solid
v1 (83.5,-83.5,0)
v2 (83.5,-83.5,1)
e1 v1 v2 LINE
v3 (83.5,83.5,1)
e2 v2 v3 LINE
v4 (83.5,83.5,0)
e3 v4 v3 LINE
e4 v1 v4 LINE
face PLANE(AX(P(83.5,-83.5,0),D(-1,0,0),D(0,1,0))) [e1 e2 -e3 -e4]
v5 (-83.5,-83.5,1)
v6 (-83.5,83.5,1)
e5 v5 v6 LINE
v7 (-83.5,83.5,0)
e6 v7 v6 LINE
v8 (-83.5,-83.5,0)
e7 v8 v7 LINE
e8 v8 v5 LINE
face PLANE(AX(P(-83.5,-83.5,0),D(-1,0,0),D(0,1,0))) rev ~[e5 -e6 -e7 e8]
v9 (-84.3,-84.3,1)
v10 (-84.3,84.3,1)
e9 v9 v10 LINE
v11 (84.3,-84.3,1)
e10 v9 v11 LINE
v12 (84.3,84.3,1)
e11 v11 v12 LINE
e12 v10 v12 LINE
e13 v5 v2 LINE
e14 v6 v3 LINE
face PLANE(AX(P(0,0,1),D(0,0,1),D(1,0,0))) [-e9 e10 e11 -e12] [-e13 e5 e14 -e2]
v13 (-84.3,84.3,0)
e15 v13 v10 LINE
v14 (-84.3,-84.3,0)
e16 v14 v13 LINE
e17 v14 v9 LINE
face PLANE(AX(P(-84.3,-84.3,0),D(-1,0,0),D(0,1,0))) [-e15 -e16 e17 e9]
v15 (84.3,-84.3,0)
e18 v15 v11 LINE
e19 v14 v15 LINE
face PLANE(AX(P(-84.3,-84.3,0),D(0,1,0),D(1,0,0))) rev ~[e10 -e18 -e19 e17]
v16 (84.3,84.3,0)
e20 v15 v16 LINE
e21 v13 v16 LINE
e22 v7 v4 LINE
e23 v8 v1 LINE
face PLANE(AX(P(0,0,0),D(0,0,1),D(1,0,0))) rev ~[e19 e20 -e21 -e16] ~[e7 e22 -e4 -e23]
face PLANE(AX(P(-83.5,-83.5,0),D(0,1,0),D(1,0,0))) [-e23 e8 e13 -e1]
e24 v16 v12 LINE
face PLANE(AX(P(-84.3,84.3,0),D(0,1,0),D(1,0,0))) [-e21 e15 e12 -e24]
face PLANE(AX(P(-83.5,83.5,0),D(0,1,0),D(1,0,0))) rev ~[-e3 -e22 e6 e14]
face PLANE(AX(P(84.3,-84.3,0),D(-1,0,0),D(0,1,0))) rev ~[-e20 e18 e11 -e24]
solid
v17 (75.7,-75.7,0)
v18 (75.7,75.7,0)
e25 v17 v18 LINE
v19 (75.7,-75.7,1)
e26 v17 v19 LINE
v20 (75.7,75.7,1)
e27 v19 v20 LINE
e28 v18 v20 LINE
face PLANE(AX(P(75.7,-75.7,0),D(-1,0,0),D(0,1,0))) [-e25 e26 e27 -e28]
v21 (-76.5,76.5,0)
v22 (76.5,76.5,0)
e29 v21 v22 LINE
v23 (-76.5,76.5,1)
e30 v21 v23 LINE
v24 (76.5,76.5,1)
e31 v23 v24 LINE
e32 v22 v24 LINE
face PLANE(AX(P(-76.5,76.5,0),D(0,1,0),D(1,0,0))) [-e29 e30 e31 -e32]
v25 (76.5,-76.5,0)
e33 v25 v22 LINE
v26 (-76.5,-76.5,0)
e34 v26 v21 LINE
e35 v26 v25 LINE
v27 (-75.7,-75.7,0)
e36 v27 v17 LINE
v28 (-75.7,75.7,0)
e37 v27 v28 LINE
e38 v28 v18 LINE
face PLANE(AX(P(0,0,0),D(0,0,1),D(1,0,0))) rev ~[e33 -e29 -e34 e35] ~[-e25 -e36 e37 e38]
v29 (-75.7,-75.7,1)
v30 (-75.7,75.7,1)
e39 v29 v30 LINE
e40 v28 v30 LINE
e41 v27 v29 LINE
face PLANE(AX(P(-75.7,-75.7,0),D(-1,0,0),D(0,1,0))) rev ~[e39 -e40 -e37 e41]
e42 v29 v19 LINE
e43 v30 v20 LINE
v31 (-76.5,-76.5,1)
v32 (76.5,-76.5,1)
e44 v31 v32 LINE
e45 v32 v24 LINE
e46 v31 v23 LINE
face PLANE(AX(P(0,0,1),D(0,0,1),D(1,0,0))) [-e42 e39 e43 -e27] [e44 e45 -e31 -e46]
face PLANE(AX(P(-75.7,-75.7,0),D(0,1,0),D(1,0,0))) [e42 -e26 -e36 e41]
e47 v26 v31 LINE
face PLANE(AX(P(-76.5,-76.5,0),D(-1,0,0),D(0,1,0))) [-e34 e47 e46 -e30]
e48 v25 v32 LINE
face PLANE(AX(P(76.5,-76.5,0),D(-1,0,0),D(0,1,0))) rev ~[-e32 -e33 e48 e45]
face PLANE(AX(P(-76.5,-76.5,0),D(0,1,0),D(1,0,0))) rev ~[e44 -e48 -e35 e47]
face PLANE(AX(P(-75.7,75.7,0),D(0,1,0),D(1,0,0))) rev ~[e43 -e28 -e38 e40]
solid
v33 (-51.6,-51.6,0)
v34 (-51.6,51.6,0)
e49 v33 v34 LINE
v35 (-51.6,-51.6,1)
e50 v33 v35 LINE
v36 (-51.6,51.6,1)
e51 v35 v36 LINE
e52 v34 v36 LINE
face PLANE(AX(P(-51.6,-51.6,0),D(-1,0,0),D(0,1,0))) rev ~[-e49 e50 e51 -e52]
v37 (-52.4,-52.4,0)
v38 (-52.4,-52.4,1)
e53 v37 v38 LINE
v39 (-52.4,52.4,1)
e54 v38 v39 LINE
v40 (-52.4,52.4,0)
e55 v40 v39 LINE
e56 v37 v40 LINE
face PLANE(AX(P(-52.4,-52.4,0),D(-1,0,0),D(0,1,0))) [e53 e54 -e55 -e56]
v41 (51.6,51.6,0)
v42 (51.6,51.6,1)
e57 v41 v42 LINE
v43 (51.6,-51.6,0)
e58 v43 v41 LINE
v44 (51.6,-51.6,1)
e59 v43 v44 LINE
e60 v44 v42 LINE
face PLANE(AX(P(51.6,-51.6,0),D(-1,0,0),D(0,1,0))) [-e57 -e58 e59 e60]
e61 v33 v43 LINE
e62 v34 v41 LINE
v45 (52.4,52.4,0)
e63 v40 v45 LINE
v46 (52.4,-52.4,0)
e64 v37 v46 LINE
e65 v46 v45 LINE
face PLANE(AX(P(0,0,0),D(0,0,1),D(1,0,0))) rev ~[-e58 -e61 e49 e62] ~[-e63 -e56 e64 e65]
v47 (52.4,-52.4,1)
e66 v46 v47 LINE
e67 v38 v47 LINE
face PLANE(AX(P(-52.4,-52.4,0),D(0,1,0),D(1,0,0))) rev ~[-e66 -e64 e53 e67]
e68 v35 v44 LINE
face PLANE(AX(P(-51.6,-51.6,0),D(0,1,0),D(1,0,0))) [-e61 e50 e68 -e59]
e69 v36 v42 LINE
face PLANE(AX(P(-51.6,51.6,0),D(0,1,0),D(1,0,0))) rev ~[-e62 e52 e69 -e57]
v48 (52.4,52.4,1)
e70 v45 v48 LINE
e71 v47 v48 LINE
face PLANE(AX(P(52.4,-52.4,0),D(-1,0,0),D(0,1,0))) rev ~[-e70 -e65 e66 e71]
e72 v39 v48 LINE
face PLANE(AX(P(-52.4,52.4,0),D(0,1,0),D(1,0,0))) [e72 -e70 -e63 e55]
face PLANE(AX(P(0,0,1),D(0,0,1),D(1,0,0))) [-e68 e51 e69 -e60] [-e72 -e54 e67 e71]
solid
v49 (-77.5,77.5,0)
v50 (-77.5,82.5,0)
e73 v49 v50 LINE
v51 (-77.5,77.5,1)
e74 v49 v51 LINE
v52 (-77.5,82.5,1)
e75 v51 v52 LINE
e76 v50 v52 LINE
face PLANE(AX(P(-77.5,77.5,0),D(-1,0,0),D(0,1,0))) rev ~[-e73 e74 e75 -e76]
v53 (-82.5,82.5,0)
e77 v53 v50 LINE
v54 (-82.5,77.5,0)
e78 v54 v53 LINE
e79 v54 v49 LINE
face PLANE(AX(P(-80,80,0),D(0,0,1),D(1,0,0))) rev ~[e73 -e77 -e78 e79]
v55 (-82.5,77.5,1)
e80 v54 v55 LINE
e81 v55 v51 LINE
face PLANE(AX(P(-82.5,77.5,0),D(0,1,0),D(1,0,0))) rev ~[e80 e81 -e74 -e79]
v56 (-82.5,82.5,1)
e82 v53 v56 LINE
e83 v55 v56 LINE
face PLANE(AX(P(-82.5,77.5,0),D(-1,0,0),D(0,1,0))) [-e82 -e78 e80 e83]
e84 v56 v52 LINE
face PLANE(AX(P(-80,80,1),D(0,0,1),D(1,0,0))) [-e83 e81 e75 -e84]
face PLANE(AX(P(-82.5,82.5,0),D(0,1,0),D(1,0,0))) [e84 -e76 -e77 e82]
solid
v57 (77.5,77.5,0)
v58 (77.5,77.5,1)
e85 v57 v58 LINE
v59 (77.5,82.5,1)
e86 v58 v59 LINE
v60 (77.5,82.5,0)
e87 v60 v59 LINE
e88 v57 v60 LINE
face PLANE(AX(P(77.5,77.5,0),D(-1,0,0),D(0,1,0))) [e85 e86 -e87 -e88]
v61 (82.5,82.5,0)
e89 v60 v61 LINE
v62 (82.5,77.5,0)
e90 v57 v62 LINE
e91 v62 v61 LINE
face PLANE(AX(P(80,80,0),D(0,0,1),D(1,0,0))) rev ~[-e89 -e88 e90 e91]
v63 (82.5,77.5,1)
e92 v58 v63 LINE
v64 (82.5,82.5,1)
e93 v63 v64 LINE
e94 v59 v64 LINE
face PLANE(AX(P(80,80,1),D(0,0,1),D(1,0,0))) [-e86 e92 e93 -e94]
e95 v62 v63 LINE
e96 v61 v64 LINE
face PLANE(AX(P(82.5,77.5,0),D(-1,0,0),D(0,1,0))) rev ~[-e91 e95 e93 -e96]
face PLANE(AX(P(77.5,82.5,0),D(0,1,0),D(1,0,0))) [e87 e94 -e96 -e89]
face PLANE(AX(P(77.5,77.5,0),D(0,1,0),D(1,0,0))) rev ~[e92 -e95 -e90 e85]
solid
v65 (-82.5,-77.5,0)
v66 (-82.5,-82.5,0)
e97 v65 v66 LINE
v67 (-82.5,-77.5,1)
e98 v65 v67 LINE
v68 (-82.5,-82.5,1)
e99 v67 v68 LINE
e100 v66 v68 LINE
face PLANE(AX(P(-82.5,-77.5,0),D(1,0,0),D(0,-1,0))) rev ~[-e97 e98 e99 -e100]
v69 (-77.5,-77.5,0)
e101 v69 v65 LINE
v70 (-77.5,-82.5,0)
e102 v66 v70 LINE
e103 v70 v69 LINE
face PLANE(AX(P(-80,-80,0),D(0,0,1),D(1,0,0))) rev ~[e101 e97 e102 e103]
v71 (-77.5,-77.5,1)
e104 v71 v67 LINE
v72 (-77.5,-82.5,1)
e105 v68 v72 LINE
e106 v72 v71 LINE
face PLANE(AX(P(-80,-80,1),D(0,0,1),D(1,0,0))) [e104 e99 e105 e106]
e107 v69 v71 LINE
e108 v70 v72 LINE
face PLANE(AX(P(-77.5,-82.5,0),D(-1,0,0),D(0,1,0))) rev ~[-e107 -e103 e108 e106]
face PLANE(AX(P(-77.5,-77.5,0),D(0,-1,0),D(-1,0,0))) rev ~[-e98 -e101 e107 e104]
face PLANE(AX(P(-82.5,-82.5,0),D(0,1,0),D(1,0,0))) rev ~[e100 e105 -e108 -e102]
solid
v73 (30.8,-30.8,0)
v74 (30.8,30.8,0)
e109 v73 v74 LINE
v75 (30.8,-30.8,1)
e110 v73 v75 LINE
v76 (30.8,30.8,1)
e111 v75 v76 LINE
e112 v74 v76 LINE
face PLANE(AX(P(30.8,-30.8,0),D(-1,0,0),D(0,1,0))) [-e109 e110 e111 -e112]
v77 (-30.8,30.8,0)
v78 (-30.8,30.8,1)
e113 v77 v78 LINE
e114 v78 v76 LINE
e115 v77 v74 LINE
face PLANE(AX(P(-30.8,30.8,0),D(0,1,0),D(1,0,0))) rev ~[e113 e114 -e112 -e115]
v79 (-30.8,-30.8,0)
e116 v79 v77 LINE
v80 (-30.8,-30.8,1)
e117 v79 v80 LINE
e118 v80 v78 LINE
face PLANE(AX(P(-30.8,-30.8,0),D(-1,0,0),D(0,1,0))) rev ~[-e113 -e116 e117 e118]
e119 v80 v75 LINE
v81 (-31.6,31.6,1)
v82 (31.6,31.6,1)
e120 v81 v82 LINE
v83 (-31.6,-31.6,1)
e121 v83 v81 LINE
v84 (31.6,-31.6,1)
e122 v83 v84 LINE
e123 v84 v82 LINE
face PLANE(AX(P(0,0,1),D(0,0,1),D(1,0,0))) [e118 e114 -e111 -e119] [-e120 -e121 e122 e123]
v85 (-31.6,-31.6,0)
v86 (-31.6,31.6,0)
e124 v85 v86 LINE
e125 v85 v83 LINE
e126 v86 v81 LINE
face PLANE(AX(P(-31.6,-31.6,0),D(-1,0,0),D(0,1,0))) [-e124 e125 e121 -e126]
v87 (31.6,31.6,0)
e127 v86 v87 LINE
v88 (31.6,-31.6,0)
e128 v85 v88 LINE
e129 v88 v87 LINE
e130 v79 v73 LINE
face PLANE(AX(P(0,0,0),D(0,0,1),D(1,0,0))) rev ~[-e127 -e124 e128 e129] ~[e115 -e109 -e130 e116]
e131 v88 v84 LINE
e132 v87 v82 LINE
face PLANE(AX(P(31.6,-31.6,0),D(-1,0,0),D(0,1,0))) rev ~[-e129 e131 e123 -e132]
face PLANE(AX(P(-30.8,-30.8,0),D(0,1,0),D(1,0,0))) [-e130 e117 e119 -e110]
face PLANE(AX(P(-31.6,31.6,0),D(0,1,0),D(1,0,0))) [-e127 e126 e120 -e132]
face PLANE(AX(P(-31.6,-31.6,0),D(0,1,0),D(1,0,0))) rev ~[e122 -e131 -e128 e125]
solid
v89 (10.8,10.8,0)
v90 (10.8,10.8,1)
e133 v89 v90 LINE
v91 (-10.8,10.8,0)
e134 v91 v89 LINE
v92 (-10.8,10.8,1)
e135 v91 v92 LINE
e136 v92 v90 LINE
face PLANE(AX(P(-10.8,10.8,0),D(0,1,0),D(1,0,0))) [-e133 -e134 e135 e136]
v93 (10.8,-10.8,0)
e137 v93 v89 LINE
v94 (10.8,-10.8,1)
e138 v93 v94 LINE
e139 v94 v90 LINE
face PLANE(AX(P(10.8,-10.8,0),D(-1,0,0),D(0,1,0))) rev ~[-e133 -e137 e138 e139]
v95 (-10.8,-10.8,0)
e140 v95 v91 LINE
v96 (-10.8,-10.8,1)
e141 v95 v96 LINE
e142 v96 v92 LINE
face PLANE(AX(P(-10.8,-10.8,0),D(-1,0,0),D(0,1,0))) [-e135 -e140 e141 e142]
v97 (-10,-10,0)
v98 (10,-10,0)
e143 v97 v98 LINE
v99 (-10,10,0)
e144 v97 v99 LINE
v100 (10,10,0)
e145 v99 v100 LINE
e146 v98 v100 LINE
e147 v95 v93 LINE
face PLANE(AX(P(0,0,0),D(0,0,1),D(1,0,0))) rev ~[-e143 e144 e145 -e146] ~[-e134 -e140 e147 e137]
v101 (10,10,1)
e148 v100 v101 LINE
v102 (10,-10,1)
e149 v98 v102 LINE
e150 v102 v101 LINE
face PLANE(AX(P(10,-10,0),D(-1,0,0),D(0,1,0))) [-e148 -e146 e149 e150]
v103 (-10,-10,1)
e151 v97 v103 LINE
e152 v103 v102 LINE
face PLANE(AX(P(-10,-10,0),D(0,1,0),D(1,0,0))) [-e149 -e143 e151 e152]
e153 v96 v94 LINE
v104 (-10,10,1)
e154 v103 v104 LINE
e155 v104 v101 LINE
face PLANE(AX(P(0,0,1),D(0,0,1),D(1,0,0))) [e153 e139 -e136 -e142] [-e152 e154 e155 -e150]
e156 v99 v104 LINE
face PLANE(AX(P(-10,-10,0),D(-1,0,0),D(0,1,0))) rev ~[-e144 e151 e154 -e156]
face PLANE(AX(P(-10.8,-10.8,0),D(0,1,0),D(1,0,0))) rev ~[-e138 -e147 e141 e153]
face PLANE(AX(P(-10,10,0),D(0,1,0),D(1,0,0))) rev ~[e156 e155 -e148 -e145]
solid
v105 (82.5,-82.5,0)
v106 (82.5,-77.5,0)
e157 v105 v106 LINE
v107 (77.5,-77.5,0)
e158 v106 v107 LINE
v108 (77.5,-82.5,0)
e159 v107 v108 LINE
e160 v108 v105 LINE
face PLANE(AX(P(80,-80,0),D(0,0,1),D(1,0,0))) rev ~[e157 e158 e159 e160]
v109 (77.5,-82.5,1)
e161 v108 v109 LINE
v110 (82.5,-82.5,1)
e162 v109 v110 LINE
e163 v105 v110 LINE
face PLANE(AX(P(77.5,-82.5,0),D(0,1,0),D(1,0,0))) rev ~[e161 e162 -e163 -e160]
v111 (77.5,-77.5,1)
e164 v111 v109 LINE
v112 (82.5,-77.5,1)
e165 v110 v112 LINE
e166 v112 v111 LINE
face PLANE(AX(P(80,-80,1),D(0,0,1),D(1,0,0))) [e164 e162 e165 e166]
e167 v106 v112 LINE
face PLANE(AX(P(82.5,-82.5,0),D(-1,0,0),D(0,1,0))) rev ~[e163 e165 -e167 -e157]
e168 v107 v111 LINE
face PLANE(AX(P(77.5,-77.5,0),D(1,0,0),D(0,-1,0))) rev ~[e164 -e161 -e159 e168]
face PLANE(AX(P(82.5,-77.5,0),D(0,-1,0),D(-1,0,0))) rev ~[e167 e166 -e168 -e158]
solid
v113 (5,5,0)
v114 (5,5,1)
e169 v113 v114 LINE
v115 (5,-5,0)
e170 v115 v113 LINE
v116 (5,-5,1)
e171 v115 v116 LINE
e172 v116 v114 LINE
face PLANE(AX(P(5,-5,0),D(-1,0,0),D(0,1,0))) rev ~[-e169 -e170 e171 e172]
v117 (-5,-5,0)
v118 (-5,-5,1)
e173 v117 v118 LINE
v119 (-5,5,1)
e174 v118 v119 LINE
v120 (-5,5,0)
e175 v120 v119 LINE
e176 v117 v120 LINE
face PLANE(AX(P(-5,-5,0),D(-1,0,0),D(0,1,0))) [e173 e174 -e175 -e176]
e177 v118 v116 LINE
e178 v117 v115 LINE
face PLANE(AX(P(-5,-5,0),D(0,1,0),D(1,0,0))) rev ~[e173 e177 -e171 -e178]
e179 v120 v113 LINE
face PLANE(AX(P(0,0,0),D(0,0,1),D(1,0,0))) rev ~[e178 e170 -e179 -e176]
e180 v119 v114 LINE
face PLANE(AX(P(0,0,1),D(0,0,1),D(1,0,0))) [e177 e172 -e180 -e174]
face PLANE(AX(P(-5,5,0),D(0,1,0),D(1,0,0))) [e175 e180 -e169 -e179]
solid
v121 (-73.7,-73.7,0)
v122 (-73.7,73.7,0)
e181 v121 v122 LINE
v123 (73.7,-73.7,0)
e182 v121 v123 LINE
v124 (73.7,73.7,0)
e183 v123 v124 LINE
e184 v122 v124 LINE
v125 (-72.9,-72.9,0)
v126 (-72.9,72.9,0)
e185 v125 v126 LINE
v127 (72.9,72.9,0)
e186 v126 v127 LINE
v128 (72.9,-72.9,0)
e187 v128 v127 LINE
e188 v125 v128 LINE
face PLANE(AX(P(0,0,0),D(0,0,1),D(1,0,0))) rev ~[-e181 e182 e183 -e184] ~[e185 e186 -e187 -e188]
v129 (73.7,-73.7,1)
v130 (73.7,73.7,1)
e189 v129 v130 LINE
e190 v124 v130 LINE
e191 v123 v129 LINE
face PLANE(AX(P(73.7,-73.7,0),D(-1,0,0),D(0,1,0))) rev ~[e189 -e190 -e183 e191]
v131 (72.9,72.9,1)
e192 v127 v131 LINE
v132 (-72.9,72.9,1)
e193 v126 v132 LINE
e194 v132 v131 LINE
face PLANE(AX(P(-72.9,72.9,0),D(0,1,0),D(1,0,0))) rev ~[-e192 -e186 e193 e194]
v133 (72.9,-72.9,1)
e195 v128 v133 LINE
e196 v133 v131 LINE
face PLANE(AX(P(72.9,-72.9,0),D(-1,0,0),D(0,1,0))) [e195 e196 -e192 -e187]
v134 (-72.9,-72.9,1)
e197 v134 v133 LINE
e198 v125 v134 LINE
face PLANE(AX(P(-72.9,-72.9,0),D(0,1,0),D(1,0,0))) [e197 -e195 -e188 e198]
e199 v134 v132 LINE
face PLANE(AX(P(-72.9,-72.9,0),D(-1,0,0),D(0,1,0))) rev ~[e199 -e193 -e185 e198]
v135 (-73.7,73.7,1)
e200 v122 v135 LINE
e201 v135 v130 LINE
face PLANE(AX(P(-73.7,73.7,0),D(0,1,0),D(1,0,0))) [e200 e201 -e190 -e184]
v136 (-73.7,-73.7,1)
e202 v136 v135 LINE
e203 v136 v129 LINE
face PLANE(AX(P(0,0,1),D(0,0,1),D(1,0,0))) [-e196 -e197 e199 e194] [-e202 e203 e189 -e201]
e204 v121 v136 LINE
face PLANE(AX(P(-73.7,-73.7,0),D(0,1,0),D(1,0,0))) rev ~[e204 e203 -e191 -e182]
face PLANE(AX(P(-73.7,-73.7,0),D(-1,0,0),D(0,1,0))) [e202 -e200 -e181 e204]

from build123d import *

# Parameters (mm, degrees)
F0_W     = 168.6
F0_H     = 168.6
F0_W_2   = 167
F0_H_2   = 167
F1_DEPTH = 1
F0_W_3   = 5
F0_H_3   = 5
F0_W_4   = 153
F0_H_4   = 153
F0_W_5   = 151.4
F0_H_5   = 151.4
F0_W_6   = 147.4
F0_H_6   = 147.4
F0_W_7   = 145.8
F0_H_7   = 145.8
F0_W_8   = 104.8
F0_H_8   = 104.8
F0_W_9   = 103.2
F0_H_9   = 103.2
F0_W_10  = 63.2
F0_H_10  = 63.2
F0_W_11  = 61.6
F0_H_11  = 61.6
F0_W_12  = 21.6
F0_H_12  = 21.6
F0_W_13  = 20
F0_H_13  = 20
F0_W_14  = 10
F0_H_14  = 10


# Not quite as in the source:
# - a feature names something its author has since deleted; it is built from what else it names


with BuildPart() as f1:
    # F0 (on Top) → F1 (new body)
    with BuildSketch(Plane.XY):
        Rectangle(F0_W, F0_H)
        Rectangle(F0_W_2, F0_H_2, mode=Mode.SUBTRACT)
    extrude(amount=F1_DEPTH)


with BuildPart() as f1b:
    # F0 (on Top) → F1, piece 2 (new body)
    with BuildSketch(Plane.XY):
        with Locations((-80, 80)):
            Rectangle(F0_W_3, F0_H_3)
    extrude(amount=F1_DEPTH)


with BuildPart() as f1c:
    # F0 (on Top) → F1, piece 3 (new body)
    with BuildSketch(Plane.XY):
        Rectangle(F0_W_4, F0_H_4)
        Rectangle(F0_W_5, F0_H_5, mode=Mode.SUBTRACT)
    extrude(amount=F1_DEPTH)


with BuildPart() as f1d:
    # F0 (on Top) → F1, piece 4 (new body)
    with BuildSketch(Plane.XY):
        Rectangle(F0_W_6, F0_H_6)
        Rectangle(F0_W_7, F0_H_7, mode=Mode.SUBTRACT)
    extrude(amount=F1_DEPTH)


with BuildPart() as f1e:
    # F0 (on Top) → F1, piece 5 (new body)
    with BuildSketch(Plane.XY):
        Rectangle(F0_W_8, F0_H_8)
        Rectangle(F0_W_9, F0_H_9, mode=Mode.SUBTRACT)
    extrude(amount=F1_DEPTH)


with BuildPart() as f1f:
    # F0 (on Top) → F1, piece 6 (new body)
    with BuildSketch(Plane.XY):
        Rectangle(F0_W_10, F0_H_10)
        Rectangle(F0_W_11, F0_H_11, mode=Mode.SUBTRACT)
    extrude(amount=F1_DEPTH)


with BuildPart() as f1g:
    # F0 (on Top) → F1, piece 7 (new body)
    with BuildSketch(Plane.XY):
        Rectangle(F0_W_12, F0_H_12)
        Rectangle(F0_W_13, F0_H_13, mode=Mode.SUBTRACT)
    extrude(amount=F1_DEPTH)


with BuildPart() as f1h:
    # F0 (on Top) → F1, piece 8 (new body)
    with BuildSketch(Plane.XY):
        Rectangle(F0_W_14, F0_H_14)
    extrude(amount=F1_DEPTH)


with BuildPart() as f1i:
    # F0 (on Top) → F1, piece 9 (new body)
    with BuildSketch(Plane.XY):
        with Locations((80, 80)):
            Rectangle(F0_W_3, F0_H_3)
    extrude(amount=F1_DEPTH)


with BuildPart() as f1j:
    # F0 (on Top) → F1, piece 10 (new body)
    with BuildSketch(Plane.XY):
        Polygon((77.5, -77.5), (77.5, -80), (77.5, -82.5), (82.5, -82.5), (82.5, -77.5), align=None)
    extrude(amount=F1_DEPTH)


with BuildPart() as f1k:
    # F0 (on Top) → F1, piece 11 (new body)
    with BuildSketch(Plane.XY):
        Polygon((-77.5, -77.5), (-82.5, -77.5), (-82.5, -82.5), (-77.5, -82.5), (-77.5, -80), align=None)
    extrude(amount=F1_DEPTH)


solid = Compound([f1.part, f1b.part, f1c.part, f1d.part, f1e.part, f1f.part, f1g.part, f1h.part, f1i.part, f1j.part, f1k.part])
